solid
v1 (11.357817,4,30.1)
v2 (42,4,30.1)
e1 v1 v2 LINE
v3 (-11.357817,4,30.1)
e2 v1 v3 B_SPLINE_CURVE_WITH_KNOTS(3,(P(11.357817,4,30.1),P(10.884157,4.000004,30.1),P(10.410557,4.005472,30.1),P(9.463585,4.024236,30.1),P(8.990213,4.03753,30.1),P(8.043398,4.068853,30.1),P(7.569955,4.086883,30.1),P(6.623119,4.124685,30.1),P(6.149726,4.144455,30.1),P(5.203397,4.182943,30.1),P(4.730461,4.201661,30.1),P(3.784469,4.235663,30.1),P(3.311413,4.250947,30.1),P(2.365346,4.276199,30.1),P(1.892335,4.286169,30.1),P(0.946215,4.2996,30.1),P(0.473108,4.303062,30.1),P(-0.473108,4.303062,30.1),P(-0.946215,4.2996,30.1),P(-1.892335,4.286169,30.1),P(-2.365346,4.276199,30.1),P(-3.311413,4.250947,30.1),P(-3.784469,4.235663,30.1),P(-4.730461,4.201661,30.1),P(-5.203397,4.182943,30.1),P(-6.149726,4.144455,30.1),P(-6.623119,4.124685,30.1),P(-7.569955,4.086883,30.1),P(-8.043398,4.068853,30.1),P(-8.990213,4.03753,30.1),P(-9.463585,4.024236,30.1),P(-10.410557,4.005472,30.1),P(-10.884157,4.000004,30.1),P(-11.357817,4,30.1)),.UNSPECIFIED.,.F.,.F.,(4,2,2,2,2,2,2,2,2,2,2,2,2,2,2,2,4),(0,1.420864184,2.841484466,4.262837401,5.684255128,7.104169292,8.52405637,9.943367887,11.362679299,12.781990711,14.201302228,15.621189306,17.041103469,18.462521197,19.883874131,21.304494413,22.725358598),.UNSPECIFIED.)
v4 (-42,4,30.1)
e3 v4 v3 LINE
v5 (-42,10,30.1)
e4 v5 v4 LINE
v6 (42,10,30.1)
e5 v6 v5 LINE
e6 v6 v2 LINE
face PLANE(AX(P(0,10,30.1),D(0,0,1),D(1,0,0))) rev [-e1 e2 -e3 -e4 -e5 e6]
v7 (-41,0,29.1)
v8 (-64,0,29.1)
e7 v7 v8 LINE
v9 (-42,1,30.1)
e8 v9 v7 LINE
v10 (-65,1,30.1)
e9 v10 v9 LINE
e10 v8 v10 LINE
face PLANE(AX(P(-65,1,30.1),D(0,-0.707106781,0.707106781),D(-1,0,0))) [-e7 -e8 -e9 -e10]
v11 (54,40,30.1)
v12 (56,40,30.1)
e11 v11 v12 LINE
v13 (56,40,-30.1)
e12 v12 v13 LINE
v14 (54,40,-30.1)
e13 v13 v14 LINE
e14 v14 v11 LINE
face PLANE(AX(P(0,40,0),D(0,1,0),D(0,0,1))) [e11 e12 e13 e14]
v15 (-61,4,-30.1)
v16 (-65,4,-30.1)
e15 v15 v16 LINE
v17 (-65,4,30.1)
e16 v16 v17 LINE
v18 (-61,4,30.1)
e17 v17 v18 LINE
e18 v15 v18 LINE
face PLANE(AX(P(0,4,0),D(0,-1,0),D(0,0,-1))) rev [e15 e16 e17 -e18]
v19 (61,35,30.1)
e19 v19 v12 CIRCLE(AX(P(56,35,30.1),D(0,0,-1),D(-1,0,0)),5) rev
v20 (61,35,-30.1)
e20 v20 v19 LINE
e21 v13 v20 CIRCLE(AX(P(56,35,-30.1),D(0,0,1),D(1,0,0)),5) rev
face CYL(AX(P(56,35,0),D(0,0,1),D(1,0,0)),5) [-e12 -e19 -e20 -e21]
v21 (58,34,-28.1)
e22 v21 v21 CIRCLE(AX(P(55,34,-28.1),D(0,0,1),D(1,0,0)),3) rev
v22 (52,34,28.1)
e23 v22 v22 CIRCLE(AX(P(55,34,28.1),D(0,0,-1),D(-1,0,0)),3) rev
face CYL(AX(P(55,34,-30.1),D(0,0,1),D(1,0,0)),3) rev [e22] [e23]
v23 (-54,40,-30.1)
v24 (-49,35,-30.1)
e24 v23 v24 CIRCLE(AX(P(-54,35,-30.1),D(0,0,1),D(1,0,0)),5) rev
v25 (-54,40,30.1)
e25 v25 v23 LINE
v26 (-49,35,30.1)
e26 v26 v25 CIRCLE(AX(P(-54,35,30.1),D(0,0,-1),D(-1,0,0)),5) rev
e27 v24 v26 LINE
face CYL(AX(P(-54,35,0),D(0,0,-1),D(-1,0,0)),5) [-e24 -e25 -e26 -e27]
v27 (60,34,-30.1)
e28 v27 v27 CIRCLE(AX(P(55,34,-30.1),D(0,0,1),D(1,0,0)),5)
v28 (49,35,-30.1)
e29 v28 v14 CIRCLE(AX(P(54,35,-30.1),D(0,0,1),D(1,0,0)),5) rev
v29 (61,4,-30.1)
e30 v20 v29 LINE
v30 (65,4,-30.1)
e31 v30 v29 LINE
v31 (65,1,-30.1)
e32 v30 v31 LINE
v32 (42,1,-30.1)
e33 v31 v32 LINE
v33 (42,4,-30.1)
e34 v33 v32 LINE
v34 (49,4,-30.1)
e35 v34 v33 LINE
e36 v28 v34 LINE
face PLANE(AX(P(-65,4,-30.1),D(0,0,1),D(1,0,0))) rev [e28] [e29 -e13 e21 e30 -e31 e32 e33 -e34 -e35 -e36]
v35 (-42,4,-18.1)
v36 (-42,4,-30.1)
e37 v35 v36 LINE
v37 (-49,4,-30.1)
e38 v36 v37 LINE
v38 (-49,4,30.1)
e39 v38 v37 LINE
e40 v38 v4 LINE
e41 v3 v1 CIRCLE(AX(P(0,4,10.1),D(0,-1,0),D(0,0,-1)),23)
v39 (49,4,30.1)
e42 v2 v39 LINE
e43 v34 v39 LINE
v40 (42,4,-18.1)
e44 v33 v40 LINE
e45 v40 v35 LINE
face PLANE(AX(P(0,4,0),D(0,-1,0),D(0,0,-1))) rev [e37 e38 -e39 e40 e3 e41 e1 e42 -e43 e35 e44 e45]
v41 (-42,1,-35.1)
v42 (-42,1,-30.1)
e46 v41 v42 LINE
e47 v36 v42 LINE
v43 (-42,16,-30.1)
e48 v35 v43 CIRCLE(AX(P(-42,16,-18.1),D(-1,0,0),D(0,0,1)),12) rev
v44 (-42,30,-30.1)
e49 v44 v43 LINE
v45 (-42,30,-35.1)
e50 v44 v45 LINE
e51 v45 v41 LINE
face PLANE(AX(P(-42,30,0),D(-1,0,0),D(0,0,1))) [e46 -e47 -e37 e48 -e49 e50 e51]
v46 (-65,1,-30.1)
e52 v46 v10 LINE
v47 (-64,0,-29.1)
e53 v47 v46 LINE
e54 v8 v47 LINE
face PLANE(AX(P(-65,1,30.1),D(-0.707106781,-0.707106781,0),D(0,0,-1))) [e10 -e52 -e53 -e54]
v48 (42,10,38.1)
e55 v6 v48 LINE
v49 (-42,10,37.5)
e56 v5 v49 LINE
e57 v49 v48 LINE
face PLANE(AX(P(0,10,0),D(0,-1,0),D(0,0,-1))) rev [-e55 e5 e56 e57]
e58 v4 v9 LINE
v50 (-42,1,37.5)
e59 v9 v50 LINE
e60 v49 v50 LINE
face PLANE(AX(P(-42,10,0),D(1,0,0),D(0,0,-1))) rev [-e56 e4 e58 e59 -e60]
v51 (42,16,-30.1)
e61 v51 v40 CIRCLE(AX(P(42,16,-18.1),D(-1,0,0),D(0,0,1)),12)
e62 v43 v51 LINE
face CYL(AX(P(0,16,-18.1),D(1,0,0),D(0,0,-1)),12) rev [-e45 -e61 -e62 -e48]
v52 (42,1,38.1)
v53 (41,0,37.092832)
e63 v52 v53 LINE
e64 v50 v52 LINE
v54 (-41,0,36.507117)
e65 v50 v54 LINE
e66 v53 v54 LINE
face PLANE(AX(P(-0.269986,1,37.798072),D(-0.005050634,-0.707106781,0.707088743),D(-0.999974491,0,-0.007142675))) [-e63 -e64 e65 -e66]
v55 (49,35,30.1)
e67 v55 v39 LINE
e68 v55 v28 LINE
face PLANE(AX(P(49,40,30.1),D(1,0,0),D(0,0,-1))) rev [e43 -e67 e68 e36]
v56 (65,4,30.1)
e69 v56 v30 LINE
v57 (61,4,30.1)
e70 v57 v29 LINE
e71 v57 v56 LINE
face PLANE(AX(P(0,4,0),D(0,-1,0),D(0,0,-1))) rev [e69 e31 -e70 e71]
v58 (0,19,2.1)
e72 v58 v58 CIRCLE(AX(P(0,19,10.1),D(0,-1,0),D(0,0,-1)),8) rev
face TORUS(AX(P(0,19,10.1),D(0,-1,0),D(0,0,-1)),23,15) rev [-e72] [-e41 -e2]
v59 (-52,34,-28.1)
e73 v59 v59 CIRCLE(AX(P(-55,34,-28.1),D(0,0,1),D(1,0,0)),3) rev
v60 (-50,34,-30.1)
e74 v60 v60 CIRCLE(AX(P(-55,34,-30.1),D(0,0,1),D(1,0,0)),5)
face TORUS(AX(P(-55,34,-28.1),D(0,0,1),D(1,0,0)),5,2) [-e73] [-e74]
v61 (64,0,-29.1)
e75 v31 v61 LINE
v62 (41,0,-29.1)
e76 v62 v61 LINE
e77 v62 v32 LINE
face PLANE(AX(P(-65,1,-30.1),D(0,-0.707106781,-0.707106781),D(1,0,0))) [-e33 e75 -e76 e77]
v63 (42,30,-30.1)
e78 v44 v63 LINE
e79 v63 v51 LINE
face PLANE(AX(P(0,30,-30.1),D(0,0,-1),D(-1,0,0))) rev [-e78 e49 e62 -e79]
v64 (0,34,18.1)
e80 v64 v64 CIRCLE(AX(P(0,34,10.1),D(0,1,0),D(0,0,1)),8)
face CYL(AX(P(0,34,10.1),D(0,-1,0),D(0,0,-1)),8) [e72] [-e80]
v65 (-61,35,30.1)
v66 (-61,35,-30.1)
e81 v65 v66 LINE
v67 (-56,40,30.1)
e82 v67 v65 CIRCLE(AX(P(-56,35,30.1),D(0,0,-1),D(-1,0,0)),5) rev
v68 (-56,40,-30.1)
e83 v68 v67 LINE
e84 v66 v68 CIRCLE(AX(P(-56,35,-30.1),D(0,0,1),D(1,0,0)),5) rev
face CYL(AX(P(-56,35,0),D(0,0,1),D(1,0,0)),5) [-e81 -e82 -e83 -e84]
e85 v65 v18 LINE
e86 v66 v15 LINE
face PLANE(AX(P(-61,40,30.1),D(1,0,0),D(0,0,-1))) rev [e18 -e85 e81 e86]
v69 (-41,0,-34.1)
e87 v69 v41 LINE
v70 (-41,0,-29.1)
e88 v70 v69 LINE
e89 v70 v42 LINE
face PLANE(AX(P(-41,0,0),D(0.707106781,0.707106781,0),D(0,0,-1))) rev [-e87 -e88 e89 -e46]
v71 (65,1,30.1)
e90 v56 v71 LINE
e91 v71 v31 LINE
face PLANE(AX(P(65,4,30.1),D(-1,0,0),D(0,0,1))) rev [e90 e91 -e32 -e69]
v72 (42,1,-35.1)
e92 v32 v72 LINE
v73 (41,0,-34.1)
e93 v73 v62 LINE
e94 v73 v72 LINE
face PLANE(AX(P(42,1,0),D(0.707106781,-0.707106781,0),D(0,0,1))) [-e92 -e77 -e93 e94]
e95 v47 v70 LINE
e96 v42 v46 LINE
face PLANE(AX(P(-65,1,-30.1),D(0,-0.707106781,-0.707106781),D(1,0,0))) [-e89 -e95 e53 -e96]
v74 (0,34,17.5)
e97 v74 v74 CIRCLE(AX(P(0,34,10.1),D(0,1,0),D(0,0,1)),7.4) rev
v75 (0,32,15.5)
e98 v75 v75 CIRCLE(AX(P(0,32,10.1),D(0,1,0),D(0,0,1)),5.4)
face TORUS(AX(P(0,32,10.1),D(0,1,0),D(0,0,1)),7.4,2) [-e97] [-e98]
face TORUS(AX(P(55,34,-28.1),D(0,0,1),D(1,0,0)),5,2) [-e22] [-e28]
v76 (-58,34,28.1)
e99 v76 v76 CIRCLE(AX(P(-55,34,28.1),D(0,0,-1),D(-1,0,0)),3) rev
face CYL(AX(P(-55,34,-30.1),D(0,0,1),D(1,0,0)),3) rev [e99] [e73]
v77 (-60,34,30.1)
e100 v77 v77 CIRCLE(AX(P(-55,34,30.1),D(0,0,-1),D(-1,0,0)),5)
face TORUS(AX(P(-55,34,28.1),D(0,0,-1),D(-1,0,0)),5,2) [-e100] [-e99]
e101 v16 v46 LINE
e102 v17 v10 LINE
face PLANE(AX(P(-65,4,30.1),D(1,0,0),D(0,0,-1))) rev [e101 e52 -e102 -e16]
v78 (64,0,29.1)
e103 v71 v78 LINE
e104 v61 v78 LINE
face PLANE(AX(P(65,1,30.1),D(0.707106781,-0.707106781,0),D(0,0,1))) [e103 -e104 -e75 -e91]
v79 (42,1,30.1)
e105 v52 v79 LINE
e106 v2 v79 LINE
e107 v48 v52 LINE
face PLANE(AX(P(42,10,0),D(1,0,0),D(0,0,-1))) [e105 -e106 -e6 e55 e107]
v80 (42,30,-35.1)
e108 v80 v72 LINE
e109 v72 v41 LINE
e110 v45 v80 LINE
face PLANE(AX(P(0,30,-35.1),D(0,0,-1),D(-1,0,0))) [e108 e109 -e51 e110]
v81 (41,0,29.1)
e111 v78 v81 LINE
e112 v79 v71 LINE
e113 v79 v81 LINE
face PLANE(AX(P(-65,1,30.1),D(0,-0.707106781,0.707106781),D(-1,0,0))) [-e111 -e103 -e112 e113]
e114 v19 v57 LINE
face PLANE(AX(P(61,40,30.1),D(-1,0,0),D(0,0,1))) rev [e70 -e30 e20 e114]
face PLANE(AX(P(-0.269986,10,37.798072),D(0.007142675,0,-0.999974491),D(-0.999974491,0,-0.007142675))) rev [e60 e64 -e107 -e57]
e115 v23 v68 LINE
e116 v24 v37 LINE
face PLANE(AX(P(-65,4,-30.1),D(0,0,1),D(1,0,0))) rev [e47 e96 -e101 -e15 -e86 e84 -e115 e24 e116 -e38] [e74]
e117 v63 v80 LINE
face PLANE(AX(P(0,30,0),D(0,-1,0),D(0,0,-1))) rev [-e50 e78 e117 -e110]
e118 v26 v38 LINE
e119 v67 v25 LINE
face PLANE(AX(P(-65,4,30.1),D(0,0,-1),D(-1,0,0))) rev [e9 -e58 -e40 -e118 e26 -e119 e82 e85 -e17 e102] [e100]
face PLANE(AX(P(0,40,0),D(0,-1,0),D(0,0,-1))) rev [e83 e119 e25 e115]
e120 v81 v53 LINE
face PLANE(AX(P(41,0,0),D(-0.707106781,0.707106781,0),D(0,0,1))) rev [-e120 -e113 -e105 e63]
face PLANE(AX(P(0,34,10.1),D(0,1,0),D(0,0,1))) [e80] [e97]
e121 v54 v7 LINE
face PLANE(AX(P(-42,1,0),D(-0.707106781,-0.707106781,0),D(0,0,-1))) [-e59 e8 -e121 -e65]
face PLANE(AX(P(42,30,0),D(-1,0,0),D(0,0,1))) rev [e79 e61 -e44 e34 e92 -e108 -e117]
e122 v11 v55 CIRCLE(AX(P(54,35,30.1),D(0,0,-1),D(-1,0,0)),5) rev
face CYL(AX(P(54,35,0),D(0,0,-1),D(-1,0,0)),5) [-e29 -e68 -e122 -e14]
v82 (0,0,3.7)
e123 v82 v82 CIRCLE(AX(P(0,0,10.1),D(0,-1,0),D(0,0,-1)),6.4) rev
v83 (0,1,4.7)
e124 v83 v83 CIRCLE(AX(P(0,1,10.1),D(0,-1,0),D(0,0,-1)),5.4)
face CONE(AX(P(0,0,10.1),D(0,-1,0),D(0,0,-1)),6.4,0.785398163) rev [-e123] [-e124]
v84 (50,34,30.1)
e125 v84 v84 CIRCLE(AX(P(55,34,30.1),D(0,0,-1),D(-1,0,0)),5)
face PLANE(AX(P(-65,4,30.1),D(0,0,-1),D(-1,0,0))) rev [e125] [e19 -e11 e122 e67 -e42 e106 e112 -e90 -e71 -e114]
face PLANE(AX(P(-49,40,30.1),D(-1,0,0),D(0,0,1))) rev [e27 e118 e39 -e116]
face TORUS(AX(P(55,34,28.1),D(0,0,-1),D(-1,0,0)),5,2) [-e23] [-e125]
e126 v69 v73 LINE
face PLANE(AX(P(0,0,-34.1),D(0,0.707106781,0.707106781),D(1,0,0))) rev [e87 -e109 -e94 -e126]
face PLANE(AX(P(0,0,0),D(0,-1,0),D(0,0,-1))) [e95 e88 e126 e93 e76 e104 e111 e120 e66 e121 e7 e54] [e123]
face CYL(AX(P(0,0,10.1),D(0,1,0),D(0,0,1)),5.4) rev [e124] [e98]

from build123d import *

# Parameters (mm, degrees)
SKETCH_1_W          = 130
SKETCH_1_H          = 60.2
EXTRUDE_1_DEPTH     = 4
SKETCH_2_W          = 12
SKETCH_2_H          = 60.2
EXTRUDE_2_DEPTH     = 36
SKETCH_4_R          = 3
CUT_EXTRUDE_1_DEPTH = 98.206172644
FILLET_1_R          = 5
SKETCH_5_R          = 8
EXTRUDE_3_DEPTH     = 30
SKETCH_6_R          = 5.4
CUT_EXTRUDE_2_DEPTH = 80.290667799
FILLET_3_R          = 2
SKETCH_8_W          = 84
SKETCH_8_H          = 5
EXTRUDE_4_DEPTH     = 30
EXTRUDE_5_DEPTH     = 10
CHAMFER_2_SIZE      = 1
FILLET_5_R          = 2
FILLET_6_R          = 12
FILLET_2_R          = 15


with BuildPart() as part:
    # Эскиз1 → Бобышка-Вытянуть1 (new body)
    with BuildSketch(Plane(origin=(0, 0, 0), x_dir=(1, 0, 0), z_dir=(0, 1, 0))):
        Rectangle(SKETCH_1_W, SKETCH_1_H)
    extrude(amount=EXTRUDE_1_DEPTH)

    # Эскиз2 → Бобышка-Вытянуть2 (add)
    with BuildSketch(Plane(origin=(0, 4, 0), x_dir=(1, 0, 0), z_dir=(0, 1, 0))):
        with Locations((-55, 0)):
            Rectangle(SKETCH_2_W, SKETCH_2_H)
        with Locations((55, 0)):
            Rectangle(SKETCH_2_W, SKETCH_2_H)
    extrude(amount=EXTRUDE_2_DEPTH)

    # Эскиз4 → Вырез-Вытянуть1 (cut, through all)
    with BuildSketch(Plane.XY.offset(30.1)):
        with Locations((-55, 34)):
            Circle(SKETCH_4_R)
        with Locations(Location((55, 34, 0), (0, 0, 180))):
            Circle(SKETCH_4_R)
    extrude(amount=-CUT_EXTRUDE_1_DEPTH, mode=Mode.SUBTRACT)

    # Скругление1
    fillet_1_edges = [part.edges().sort_by_distance(p)[0] for p in [
        (-49, 40, 0),
        (-61, 40, 0),
        (61, 40, 0),
        (49, 40, 0),
    ]]
    fillet(fillet_1_edges, radius=FILLET_1_R)

    # Эскиз5 → Бобышка-Вытянуть3 (add)
    with BuildSketch(Plane(origin=(0, 4, 0), x_dir=(1, 0, 0), z_dir=(0, 1, 0))):
        with Locations(Location((0, -10.1, 0), (0, 0, 90))):
            Circle(SKETCH_5_R)
    extrude(amount=EXTRUDE_3_DEPTH)

    # Эскиз6 → Вырез-Вытянуть2 (cut, through all)
    with BuildSketch(Plane(origin=(0, 34, 0), x_dir=(1, 0, 0), z_dir=(0, 1, 0))):
        with Locations(Location((0, -10.1, 0), (0, 0, 270))):
            Circle(SKETCH_6_R)
    extrude(amount=-CUT_EXTRUDE_2_DEPTH, mode=Mode.SUBTRACT)

    # Скругление3
    fillet_3_edges = [part.edges().sort_by_distance(p)[0] for p in [
        (0, 34, 4.7),
    ]]
    fillet(fillet_3_edges, radius=FILLET_3_R)

    # Эскиз8 → Бобышка-Вытянуть4 (add)
    with BuildSketch(Plane(origin=(0, 0, 0), x_dir=(1, 0, 0), z_dir=(0, 1, 0))):
        with Locations((0, 32.6)):
            Rectangle(SKETCH_8_W, SKETCH_8_H)
    extrude(amount=EXTRUDE_4_DEPTH)

    # Эскиз8<3> → Бобышка-Вытянуть5 (add)
    with BuildSketch(Plane(origin=(0, 0, 0), x_dir=(1, 0, 0), z_dir=(0, 1, 0))):
        Polygon((-42, -30.1), (-42, -37.5), (42, -38.1), (42, -30.1), align=None)
    extrude(amount=EXTRUDE_5_DEPTH)

    # Фаска2
    chamfer_2_edges = [part.edges().sort_by_distance(p)[0] for p in [
        (53.5, 0, 30.1),
        (-42, 0, 33.8),
        (0, 0, 37.8),
        (42, 0, 34.1),
        (-53.5, 0, 30.1),
        (-65, 0, 0),
        (53.5, 0, -30.1),
        (65, 0, 0),
        (0, 0, 4.7),
        (-53.5, 0, -30.1),
        (42, 0, -32.6),
        (-42, 0, -32.6),
        (0, 0, -35.1),
    ]]
    chamfer(chamfer_2_edges, length=CHAMFER_2_SIZE)

    # Скругление5
    fillet_5_edges = [part.edges().sort_by_distance(p)[0] for p in [
        (-58, 34, -30.1),
        (-58, 34, 30.1),
        (58, 34, -30.1),
        (58, 34, 30.1),
    ]]
    fillet(fillet_5_edges, radius=FILLET_5_R)

    # Скругление6
    fillet_6_edges = [part.edges().sort_by_distance(p)[0] for p in [
        (0, 4, -30.1),
    ]]
    fillet(fillet_6_edges, radius=FILLET_6_R)

    # Скругление2
    # the kernel refuses this fillet: 15 mm, written as the material it adds along each edge
    with BuildSketch(Plane(origin=(0, 4, 10.1), x_dir=(0, 0, -1), z_dir=(1, 0, 0))) as fillet_2_piece_1:
        with BuildLine():
            CenterArc((8 + FILLET_2_R, FILLET_2_R), FILLET_2_R, 180, 90)
            Line((8, FILLET_2_R), (8, 0))
            Line((8, 0), (8 + FILLET_2_R, 0))
        make_face()
    revolve(axis=Axis((0, 4, 10.1), (0, 1, 0)))


solid = part.part
